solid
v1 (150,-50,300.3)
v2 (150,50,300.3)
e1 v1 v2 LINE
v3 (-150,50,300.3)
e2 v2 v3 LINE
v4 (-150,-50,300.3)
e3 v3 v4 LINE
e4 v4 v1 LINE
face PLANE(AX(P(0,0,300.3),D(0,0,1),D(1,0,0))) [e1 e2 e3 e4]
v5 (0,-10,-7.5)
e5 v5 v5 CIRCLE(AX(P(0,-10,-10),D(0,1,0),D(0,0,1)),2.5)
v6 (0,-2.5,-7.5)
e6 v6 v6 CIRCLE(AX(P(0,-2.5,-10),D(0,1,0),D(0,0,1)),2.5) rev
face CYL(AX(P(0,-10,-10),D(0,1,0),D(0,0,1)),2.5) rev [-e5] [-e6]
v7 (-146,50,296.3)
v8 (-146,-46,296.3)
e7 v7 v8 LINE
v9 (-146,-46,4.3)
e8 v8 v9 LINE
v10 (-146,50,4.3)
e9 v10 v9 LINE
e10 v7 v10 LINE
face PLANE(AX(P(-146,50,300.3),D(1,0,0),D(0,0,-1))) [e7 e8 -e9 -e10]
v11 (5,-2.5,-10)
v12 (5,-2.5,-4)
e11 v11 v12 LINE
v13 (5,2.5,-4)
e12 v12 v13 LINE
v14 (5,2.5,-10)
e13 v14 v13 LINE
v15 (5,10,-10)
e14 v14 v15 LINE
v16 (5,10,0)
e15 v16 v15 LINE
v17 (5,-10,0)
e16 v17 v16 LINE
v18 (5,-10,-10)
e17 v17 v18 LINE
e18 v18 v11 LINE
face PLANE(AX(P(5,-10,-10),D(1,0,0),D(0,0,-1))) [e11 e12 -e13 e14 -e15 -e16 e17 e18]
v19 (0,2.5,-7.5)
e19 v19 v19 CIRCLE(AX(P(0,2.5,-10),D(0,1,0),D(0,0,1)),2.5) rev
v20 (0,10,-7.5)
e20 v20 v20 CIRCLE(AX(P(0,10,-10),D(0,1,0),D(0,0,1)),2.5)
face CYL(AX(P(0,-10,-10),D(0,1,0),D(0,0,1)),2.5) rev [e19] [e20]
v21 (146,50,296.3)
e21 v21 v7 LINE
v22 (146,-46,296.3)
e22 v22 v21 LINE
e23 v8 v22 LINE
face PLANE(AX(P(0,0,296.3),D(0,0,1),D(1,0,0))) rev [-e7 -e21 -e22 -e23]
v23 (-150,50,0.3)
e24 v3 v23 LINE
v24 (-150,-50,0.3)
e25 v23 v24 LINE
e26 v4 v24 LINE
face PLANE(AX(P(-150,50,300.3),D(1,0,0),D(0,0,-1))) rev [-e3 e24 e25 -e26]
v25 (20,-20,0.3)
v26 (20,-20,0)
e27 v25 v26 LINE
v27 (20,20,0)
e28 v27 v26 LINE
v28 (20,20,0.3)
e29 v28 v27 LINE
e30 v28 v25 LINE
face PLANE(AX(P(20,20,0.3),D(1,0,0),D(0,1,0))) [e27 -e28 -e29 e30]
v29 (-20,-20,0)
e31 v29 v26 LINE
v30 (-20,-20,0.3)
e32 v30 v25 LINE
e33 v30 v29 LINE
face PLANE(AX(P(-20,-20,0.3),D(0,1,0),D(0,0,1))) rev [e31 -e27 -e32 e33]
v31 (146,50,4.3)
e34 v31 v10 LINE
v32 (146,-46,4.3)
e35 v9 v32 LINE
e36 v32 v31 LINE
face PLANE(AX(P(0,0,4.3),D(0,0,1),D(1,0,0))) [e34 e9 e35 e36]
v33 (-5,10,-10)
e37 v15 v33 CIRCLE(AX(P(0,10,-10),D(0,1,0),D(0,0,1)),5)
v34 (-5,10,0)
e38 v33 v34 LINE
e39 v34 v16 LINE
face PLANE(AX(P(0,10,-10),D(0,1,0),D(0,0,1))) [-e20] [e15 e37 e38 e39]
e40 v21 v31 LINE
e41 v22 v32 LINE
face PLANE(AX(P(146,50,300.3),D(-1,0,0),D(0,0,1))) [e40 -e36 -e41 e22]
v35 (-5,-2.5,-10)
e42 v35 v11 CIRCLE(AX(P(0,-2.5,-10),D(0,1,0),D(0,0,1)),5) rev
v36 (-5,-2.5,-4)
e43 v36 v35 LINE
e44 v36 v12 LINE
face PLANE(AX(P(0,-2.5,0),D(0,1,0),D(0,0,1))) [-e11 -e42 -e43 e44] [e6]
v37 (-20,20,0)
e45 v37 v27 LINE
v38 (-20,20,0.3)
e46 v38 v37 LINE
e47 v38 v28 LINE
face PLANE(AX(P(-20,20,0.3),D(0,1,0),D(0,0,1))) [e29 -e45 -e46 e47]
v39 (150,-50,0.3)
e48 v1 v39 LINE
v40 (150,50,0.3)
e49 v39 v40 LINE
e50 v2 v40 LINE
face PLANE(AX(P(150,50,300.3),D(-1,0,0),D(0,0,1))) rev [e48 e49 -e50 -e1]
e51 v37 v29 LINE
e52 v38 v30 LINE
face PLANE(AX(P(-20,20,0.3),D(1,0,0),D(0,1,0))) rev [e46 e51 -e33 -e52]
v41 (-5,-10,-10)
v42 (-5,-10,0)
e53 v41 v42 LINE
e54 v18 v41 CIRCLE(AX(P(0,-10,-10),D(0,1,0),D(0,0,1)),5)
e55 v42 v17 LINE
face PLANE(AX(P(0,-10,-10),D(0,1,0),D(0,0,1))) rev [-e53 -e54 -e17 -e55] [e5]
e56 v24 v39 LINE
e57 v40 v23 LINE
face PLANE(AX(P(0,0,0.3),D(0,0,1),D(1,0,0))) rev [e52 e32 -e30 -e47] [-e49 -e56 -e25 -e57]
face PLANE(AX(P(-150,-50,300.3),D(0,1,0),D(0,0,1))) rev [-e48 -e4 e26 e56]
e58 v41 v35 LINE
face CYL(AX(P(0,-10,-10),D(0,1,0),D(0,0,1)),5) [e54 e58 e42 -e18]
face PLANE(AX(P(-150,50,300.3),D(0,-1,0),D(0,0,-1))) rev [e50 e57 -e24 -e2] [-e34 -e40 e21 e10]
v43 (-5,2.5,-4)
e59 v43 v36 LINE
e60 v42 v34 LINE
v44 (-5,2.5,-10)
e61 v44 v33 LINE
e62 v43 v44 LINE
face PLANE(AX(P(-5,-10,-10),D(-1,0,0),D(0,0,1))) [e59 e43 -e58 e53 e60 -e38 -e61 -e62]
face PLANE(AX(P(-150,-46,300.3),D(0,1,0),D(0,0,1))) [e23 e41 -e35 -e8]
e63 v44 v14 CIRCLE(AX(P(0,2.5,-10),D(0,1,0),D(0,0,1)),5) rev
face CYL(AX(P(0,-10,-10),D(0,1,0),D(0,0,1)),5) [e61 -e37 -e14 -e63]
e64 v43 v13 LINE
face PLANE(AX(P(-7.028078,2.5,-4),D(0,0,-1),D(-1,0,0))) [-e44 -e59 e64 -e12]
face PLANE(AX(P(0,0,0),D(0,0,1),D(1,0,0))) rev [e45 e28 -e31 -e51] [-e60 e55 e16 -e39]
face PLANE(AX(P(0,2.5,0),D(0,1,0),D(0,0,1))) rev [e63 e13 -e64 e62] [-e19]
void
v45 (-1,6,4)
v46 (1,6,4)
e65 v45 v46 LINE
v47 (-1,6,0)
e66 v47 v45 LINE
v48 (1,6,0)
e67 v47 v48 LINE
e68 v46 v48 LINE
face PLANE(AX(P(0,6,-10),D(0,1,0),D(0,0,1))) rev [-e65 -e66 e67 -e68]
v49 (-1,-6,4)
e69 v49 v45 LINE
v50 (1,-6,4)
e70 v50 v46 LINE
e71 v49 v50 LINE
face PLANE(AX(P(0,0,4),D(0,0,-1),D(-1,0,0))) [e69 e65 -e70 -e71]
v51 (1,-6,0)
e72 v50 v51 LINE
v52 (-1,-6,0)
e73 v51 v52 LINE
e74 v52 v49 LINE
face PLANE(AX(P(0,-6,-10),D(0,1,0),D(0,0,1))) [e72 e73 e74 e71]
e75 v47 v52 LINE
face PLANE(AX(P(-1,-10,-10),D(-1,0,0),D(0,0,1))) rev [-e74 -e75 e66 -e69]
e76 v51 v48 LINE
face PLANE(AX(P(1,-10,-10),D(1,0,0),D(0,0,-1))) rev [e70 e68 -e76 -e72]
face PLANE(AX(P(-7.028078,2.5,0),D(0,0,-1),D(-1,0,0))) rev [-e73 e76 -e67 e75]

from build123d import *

# Parameters (mm, degrees)
CROQUIS1_W                   = 40
CROQUIS1_H                   = 40
SALIENTE_EXTRUIR1_DEPTH      = 0.3
SALIENTE_EXTRUIR2_DEPTH      = 10
SALIENTE_EXTRUIR2_DEPTH_BACK = 10
CROQUIS2_R                   = 2.5
CORTAR_EXTRUIR1_DEPTH        = 2.5
CORTAR_EXTRUIR1_DEPTH_BACK   = 2.5
CROQUIS3_W                   = 14.056155144
CROQUIS3_H                   = 12
CROQUIS4_W                   = 300
CROQUIS4_H                   = 100
SALIENTE_EXTRUIR3_DEPTH      = 300
VACIADO2_START               = 4.3
VACIADO2_OUTLINE_W           = 292
VACIADO2_OUTLINE_H           = 96
VACIADO2_DEPTH               = 292
VACIADO2_START_2             = 4
VACIADO2_2_OUTLINE_W         = 32
VACIADO2_2_OUTLINE_H         = 32
VACIADO2_2_DEPTH             = 0.3
VACIADO2_3_OUTLINE_W         = 2
VACIADO2_3_OUTLINE_H         = 12
VACIADO2_3_DEPTH             = 4
CROQUIS6_W                   = 32
CROQUIS6_H                   = 32
SALIENTE_EXTRUIR4_DEPTH      = 0.3


with BuildPart() as part:
    # Croquis1 → Saliente-Extruir1 (new body)
    with BuildSketch(Plane.XY):
        Rectangle(CROQUIS1_W, CROQUIS1_H)
    extrude(amount=SALIENTE_EXTRUIR1_DEPTH)

    # Croquis2 → Saliente-Extruir2 (add, two sides: drawn at the far end of the back side and taken through both)
    with BuildSketch(Plane(origin=(0, 0, 0), x_dir=(1, 0, 0), z_dir=(0, 1, 0)).offset(-SALIENTE_EXTRUIR2_DEPTH_BACK)):
        with BuildLine():
            Line((-5, 10), (-5, 0))
            Line((-5, 0), (5, 0))
            Line((5, 0), (5, 10))
            ThreePointArc((5, 10), (0, 15), (-5, 10))
        make_face()
        with Locations(Location((0, 10, 0), (0, 0, 270))):
            Circle(CROQUIS2_R, mode=Mode.SUBTRACT)
    extrude(amount=SALIENTE_EXTRUIR2_DEPTH + SALIENTE_EXTRUIR2_DEPTH_BACK)

    # Croquis3 → Cortar-Extruir1 (cut, two sides: drawn at the far end of the back side and taken through both)
    with BuildSketch(Plane(origin=(0, 0, 0), x_dir=(1, 0, 0), z_dir=(0, 1, 0)).offset(-CORTAR_EXTRUIR1_DEPTH_BACK)):
        with Locations((0, 10)):
            Rectangle(CROQUIS3_W, CROQUIS3_H)
    extrude(amount=CORTAR_EXTRUIR1_DEPTH + CORTAR_EXTRUIR1_DEPTH_BACK, mode=Mode.SUBTRACT)

    # Croquis4 → Saliente-Extruir3 (add)
    with BuildSketch(Plane.XY.offset(0.3)):
        Rectangle(CROQUIS4_W, CROQUIS4_H)
    extrude(amount=SALIENTE_EXTRUIR3_DEPTH)

    # Vaciado2: read off the stored shape, not the designer's step
    # Vaciado2 outline → Vaciado2 (cut)
    with BuildSketch(Plane.XY.offset(VACIADO2_START)):
        with Locations((0, 2)):
            Rectangle(VACIADO2_OUTLINE_W, VACIADO2_OUTLINE_H)
    extrude(amount=VACIADO2_DEPTH, mode=Mode.SUBTRACT)

    # Vaciado2 2 outline → Vaciado2 2 (cut)
    with BuildSketch(Plane.XY.offset(VACIADO2_START_2)):
        Rectangle(VACIADO2_2_OUTLINE_W, VACIADO2_2_OUTLINE_H)
    extrude(amount=VACIADO2_2_DEPTH, mode=Mode.SUBTRACT)

    # Vaciado2 3 outline → Vaciado2 3 (cut)
    with BuildSketch(Plane.XY):
        Rectangle(VACIADO2_3_OUTLINE_W, VACIADO2_3_OUTLINE_H)
    extrude(amount=VACIADO2_3_DEPTH, mode=Mode.SUBTRACT)

    # Croquis6 → Saliente-Extruir4 (add)
    with BuildSketch(Plane.XY.offset(4)):
        Rectangle(CROQUIS6_W, CROQUIS6_H)
    extrude(amount=SALIENTE_EXTRUIR4_DEPTH)


solid = part.part
